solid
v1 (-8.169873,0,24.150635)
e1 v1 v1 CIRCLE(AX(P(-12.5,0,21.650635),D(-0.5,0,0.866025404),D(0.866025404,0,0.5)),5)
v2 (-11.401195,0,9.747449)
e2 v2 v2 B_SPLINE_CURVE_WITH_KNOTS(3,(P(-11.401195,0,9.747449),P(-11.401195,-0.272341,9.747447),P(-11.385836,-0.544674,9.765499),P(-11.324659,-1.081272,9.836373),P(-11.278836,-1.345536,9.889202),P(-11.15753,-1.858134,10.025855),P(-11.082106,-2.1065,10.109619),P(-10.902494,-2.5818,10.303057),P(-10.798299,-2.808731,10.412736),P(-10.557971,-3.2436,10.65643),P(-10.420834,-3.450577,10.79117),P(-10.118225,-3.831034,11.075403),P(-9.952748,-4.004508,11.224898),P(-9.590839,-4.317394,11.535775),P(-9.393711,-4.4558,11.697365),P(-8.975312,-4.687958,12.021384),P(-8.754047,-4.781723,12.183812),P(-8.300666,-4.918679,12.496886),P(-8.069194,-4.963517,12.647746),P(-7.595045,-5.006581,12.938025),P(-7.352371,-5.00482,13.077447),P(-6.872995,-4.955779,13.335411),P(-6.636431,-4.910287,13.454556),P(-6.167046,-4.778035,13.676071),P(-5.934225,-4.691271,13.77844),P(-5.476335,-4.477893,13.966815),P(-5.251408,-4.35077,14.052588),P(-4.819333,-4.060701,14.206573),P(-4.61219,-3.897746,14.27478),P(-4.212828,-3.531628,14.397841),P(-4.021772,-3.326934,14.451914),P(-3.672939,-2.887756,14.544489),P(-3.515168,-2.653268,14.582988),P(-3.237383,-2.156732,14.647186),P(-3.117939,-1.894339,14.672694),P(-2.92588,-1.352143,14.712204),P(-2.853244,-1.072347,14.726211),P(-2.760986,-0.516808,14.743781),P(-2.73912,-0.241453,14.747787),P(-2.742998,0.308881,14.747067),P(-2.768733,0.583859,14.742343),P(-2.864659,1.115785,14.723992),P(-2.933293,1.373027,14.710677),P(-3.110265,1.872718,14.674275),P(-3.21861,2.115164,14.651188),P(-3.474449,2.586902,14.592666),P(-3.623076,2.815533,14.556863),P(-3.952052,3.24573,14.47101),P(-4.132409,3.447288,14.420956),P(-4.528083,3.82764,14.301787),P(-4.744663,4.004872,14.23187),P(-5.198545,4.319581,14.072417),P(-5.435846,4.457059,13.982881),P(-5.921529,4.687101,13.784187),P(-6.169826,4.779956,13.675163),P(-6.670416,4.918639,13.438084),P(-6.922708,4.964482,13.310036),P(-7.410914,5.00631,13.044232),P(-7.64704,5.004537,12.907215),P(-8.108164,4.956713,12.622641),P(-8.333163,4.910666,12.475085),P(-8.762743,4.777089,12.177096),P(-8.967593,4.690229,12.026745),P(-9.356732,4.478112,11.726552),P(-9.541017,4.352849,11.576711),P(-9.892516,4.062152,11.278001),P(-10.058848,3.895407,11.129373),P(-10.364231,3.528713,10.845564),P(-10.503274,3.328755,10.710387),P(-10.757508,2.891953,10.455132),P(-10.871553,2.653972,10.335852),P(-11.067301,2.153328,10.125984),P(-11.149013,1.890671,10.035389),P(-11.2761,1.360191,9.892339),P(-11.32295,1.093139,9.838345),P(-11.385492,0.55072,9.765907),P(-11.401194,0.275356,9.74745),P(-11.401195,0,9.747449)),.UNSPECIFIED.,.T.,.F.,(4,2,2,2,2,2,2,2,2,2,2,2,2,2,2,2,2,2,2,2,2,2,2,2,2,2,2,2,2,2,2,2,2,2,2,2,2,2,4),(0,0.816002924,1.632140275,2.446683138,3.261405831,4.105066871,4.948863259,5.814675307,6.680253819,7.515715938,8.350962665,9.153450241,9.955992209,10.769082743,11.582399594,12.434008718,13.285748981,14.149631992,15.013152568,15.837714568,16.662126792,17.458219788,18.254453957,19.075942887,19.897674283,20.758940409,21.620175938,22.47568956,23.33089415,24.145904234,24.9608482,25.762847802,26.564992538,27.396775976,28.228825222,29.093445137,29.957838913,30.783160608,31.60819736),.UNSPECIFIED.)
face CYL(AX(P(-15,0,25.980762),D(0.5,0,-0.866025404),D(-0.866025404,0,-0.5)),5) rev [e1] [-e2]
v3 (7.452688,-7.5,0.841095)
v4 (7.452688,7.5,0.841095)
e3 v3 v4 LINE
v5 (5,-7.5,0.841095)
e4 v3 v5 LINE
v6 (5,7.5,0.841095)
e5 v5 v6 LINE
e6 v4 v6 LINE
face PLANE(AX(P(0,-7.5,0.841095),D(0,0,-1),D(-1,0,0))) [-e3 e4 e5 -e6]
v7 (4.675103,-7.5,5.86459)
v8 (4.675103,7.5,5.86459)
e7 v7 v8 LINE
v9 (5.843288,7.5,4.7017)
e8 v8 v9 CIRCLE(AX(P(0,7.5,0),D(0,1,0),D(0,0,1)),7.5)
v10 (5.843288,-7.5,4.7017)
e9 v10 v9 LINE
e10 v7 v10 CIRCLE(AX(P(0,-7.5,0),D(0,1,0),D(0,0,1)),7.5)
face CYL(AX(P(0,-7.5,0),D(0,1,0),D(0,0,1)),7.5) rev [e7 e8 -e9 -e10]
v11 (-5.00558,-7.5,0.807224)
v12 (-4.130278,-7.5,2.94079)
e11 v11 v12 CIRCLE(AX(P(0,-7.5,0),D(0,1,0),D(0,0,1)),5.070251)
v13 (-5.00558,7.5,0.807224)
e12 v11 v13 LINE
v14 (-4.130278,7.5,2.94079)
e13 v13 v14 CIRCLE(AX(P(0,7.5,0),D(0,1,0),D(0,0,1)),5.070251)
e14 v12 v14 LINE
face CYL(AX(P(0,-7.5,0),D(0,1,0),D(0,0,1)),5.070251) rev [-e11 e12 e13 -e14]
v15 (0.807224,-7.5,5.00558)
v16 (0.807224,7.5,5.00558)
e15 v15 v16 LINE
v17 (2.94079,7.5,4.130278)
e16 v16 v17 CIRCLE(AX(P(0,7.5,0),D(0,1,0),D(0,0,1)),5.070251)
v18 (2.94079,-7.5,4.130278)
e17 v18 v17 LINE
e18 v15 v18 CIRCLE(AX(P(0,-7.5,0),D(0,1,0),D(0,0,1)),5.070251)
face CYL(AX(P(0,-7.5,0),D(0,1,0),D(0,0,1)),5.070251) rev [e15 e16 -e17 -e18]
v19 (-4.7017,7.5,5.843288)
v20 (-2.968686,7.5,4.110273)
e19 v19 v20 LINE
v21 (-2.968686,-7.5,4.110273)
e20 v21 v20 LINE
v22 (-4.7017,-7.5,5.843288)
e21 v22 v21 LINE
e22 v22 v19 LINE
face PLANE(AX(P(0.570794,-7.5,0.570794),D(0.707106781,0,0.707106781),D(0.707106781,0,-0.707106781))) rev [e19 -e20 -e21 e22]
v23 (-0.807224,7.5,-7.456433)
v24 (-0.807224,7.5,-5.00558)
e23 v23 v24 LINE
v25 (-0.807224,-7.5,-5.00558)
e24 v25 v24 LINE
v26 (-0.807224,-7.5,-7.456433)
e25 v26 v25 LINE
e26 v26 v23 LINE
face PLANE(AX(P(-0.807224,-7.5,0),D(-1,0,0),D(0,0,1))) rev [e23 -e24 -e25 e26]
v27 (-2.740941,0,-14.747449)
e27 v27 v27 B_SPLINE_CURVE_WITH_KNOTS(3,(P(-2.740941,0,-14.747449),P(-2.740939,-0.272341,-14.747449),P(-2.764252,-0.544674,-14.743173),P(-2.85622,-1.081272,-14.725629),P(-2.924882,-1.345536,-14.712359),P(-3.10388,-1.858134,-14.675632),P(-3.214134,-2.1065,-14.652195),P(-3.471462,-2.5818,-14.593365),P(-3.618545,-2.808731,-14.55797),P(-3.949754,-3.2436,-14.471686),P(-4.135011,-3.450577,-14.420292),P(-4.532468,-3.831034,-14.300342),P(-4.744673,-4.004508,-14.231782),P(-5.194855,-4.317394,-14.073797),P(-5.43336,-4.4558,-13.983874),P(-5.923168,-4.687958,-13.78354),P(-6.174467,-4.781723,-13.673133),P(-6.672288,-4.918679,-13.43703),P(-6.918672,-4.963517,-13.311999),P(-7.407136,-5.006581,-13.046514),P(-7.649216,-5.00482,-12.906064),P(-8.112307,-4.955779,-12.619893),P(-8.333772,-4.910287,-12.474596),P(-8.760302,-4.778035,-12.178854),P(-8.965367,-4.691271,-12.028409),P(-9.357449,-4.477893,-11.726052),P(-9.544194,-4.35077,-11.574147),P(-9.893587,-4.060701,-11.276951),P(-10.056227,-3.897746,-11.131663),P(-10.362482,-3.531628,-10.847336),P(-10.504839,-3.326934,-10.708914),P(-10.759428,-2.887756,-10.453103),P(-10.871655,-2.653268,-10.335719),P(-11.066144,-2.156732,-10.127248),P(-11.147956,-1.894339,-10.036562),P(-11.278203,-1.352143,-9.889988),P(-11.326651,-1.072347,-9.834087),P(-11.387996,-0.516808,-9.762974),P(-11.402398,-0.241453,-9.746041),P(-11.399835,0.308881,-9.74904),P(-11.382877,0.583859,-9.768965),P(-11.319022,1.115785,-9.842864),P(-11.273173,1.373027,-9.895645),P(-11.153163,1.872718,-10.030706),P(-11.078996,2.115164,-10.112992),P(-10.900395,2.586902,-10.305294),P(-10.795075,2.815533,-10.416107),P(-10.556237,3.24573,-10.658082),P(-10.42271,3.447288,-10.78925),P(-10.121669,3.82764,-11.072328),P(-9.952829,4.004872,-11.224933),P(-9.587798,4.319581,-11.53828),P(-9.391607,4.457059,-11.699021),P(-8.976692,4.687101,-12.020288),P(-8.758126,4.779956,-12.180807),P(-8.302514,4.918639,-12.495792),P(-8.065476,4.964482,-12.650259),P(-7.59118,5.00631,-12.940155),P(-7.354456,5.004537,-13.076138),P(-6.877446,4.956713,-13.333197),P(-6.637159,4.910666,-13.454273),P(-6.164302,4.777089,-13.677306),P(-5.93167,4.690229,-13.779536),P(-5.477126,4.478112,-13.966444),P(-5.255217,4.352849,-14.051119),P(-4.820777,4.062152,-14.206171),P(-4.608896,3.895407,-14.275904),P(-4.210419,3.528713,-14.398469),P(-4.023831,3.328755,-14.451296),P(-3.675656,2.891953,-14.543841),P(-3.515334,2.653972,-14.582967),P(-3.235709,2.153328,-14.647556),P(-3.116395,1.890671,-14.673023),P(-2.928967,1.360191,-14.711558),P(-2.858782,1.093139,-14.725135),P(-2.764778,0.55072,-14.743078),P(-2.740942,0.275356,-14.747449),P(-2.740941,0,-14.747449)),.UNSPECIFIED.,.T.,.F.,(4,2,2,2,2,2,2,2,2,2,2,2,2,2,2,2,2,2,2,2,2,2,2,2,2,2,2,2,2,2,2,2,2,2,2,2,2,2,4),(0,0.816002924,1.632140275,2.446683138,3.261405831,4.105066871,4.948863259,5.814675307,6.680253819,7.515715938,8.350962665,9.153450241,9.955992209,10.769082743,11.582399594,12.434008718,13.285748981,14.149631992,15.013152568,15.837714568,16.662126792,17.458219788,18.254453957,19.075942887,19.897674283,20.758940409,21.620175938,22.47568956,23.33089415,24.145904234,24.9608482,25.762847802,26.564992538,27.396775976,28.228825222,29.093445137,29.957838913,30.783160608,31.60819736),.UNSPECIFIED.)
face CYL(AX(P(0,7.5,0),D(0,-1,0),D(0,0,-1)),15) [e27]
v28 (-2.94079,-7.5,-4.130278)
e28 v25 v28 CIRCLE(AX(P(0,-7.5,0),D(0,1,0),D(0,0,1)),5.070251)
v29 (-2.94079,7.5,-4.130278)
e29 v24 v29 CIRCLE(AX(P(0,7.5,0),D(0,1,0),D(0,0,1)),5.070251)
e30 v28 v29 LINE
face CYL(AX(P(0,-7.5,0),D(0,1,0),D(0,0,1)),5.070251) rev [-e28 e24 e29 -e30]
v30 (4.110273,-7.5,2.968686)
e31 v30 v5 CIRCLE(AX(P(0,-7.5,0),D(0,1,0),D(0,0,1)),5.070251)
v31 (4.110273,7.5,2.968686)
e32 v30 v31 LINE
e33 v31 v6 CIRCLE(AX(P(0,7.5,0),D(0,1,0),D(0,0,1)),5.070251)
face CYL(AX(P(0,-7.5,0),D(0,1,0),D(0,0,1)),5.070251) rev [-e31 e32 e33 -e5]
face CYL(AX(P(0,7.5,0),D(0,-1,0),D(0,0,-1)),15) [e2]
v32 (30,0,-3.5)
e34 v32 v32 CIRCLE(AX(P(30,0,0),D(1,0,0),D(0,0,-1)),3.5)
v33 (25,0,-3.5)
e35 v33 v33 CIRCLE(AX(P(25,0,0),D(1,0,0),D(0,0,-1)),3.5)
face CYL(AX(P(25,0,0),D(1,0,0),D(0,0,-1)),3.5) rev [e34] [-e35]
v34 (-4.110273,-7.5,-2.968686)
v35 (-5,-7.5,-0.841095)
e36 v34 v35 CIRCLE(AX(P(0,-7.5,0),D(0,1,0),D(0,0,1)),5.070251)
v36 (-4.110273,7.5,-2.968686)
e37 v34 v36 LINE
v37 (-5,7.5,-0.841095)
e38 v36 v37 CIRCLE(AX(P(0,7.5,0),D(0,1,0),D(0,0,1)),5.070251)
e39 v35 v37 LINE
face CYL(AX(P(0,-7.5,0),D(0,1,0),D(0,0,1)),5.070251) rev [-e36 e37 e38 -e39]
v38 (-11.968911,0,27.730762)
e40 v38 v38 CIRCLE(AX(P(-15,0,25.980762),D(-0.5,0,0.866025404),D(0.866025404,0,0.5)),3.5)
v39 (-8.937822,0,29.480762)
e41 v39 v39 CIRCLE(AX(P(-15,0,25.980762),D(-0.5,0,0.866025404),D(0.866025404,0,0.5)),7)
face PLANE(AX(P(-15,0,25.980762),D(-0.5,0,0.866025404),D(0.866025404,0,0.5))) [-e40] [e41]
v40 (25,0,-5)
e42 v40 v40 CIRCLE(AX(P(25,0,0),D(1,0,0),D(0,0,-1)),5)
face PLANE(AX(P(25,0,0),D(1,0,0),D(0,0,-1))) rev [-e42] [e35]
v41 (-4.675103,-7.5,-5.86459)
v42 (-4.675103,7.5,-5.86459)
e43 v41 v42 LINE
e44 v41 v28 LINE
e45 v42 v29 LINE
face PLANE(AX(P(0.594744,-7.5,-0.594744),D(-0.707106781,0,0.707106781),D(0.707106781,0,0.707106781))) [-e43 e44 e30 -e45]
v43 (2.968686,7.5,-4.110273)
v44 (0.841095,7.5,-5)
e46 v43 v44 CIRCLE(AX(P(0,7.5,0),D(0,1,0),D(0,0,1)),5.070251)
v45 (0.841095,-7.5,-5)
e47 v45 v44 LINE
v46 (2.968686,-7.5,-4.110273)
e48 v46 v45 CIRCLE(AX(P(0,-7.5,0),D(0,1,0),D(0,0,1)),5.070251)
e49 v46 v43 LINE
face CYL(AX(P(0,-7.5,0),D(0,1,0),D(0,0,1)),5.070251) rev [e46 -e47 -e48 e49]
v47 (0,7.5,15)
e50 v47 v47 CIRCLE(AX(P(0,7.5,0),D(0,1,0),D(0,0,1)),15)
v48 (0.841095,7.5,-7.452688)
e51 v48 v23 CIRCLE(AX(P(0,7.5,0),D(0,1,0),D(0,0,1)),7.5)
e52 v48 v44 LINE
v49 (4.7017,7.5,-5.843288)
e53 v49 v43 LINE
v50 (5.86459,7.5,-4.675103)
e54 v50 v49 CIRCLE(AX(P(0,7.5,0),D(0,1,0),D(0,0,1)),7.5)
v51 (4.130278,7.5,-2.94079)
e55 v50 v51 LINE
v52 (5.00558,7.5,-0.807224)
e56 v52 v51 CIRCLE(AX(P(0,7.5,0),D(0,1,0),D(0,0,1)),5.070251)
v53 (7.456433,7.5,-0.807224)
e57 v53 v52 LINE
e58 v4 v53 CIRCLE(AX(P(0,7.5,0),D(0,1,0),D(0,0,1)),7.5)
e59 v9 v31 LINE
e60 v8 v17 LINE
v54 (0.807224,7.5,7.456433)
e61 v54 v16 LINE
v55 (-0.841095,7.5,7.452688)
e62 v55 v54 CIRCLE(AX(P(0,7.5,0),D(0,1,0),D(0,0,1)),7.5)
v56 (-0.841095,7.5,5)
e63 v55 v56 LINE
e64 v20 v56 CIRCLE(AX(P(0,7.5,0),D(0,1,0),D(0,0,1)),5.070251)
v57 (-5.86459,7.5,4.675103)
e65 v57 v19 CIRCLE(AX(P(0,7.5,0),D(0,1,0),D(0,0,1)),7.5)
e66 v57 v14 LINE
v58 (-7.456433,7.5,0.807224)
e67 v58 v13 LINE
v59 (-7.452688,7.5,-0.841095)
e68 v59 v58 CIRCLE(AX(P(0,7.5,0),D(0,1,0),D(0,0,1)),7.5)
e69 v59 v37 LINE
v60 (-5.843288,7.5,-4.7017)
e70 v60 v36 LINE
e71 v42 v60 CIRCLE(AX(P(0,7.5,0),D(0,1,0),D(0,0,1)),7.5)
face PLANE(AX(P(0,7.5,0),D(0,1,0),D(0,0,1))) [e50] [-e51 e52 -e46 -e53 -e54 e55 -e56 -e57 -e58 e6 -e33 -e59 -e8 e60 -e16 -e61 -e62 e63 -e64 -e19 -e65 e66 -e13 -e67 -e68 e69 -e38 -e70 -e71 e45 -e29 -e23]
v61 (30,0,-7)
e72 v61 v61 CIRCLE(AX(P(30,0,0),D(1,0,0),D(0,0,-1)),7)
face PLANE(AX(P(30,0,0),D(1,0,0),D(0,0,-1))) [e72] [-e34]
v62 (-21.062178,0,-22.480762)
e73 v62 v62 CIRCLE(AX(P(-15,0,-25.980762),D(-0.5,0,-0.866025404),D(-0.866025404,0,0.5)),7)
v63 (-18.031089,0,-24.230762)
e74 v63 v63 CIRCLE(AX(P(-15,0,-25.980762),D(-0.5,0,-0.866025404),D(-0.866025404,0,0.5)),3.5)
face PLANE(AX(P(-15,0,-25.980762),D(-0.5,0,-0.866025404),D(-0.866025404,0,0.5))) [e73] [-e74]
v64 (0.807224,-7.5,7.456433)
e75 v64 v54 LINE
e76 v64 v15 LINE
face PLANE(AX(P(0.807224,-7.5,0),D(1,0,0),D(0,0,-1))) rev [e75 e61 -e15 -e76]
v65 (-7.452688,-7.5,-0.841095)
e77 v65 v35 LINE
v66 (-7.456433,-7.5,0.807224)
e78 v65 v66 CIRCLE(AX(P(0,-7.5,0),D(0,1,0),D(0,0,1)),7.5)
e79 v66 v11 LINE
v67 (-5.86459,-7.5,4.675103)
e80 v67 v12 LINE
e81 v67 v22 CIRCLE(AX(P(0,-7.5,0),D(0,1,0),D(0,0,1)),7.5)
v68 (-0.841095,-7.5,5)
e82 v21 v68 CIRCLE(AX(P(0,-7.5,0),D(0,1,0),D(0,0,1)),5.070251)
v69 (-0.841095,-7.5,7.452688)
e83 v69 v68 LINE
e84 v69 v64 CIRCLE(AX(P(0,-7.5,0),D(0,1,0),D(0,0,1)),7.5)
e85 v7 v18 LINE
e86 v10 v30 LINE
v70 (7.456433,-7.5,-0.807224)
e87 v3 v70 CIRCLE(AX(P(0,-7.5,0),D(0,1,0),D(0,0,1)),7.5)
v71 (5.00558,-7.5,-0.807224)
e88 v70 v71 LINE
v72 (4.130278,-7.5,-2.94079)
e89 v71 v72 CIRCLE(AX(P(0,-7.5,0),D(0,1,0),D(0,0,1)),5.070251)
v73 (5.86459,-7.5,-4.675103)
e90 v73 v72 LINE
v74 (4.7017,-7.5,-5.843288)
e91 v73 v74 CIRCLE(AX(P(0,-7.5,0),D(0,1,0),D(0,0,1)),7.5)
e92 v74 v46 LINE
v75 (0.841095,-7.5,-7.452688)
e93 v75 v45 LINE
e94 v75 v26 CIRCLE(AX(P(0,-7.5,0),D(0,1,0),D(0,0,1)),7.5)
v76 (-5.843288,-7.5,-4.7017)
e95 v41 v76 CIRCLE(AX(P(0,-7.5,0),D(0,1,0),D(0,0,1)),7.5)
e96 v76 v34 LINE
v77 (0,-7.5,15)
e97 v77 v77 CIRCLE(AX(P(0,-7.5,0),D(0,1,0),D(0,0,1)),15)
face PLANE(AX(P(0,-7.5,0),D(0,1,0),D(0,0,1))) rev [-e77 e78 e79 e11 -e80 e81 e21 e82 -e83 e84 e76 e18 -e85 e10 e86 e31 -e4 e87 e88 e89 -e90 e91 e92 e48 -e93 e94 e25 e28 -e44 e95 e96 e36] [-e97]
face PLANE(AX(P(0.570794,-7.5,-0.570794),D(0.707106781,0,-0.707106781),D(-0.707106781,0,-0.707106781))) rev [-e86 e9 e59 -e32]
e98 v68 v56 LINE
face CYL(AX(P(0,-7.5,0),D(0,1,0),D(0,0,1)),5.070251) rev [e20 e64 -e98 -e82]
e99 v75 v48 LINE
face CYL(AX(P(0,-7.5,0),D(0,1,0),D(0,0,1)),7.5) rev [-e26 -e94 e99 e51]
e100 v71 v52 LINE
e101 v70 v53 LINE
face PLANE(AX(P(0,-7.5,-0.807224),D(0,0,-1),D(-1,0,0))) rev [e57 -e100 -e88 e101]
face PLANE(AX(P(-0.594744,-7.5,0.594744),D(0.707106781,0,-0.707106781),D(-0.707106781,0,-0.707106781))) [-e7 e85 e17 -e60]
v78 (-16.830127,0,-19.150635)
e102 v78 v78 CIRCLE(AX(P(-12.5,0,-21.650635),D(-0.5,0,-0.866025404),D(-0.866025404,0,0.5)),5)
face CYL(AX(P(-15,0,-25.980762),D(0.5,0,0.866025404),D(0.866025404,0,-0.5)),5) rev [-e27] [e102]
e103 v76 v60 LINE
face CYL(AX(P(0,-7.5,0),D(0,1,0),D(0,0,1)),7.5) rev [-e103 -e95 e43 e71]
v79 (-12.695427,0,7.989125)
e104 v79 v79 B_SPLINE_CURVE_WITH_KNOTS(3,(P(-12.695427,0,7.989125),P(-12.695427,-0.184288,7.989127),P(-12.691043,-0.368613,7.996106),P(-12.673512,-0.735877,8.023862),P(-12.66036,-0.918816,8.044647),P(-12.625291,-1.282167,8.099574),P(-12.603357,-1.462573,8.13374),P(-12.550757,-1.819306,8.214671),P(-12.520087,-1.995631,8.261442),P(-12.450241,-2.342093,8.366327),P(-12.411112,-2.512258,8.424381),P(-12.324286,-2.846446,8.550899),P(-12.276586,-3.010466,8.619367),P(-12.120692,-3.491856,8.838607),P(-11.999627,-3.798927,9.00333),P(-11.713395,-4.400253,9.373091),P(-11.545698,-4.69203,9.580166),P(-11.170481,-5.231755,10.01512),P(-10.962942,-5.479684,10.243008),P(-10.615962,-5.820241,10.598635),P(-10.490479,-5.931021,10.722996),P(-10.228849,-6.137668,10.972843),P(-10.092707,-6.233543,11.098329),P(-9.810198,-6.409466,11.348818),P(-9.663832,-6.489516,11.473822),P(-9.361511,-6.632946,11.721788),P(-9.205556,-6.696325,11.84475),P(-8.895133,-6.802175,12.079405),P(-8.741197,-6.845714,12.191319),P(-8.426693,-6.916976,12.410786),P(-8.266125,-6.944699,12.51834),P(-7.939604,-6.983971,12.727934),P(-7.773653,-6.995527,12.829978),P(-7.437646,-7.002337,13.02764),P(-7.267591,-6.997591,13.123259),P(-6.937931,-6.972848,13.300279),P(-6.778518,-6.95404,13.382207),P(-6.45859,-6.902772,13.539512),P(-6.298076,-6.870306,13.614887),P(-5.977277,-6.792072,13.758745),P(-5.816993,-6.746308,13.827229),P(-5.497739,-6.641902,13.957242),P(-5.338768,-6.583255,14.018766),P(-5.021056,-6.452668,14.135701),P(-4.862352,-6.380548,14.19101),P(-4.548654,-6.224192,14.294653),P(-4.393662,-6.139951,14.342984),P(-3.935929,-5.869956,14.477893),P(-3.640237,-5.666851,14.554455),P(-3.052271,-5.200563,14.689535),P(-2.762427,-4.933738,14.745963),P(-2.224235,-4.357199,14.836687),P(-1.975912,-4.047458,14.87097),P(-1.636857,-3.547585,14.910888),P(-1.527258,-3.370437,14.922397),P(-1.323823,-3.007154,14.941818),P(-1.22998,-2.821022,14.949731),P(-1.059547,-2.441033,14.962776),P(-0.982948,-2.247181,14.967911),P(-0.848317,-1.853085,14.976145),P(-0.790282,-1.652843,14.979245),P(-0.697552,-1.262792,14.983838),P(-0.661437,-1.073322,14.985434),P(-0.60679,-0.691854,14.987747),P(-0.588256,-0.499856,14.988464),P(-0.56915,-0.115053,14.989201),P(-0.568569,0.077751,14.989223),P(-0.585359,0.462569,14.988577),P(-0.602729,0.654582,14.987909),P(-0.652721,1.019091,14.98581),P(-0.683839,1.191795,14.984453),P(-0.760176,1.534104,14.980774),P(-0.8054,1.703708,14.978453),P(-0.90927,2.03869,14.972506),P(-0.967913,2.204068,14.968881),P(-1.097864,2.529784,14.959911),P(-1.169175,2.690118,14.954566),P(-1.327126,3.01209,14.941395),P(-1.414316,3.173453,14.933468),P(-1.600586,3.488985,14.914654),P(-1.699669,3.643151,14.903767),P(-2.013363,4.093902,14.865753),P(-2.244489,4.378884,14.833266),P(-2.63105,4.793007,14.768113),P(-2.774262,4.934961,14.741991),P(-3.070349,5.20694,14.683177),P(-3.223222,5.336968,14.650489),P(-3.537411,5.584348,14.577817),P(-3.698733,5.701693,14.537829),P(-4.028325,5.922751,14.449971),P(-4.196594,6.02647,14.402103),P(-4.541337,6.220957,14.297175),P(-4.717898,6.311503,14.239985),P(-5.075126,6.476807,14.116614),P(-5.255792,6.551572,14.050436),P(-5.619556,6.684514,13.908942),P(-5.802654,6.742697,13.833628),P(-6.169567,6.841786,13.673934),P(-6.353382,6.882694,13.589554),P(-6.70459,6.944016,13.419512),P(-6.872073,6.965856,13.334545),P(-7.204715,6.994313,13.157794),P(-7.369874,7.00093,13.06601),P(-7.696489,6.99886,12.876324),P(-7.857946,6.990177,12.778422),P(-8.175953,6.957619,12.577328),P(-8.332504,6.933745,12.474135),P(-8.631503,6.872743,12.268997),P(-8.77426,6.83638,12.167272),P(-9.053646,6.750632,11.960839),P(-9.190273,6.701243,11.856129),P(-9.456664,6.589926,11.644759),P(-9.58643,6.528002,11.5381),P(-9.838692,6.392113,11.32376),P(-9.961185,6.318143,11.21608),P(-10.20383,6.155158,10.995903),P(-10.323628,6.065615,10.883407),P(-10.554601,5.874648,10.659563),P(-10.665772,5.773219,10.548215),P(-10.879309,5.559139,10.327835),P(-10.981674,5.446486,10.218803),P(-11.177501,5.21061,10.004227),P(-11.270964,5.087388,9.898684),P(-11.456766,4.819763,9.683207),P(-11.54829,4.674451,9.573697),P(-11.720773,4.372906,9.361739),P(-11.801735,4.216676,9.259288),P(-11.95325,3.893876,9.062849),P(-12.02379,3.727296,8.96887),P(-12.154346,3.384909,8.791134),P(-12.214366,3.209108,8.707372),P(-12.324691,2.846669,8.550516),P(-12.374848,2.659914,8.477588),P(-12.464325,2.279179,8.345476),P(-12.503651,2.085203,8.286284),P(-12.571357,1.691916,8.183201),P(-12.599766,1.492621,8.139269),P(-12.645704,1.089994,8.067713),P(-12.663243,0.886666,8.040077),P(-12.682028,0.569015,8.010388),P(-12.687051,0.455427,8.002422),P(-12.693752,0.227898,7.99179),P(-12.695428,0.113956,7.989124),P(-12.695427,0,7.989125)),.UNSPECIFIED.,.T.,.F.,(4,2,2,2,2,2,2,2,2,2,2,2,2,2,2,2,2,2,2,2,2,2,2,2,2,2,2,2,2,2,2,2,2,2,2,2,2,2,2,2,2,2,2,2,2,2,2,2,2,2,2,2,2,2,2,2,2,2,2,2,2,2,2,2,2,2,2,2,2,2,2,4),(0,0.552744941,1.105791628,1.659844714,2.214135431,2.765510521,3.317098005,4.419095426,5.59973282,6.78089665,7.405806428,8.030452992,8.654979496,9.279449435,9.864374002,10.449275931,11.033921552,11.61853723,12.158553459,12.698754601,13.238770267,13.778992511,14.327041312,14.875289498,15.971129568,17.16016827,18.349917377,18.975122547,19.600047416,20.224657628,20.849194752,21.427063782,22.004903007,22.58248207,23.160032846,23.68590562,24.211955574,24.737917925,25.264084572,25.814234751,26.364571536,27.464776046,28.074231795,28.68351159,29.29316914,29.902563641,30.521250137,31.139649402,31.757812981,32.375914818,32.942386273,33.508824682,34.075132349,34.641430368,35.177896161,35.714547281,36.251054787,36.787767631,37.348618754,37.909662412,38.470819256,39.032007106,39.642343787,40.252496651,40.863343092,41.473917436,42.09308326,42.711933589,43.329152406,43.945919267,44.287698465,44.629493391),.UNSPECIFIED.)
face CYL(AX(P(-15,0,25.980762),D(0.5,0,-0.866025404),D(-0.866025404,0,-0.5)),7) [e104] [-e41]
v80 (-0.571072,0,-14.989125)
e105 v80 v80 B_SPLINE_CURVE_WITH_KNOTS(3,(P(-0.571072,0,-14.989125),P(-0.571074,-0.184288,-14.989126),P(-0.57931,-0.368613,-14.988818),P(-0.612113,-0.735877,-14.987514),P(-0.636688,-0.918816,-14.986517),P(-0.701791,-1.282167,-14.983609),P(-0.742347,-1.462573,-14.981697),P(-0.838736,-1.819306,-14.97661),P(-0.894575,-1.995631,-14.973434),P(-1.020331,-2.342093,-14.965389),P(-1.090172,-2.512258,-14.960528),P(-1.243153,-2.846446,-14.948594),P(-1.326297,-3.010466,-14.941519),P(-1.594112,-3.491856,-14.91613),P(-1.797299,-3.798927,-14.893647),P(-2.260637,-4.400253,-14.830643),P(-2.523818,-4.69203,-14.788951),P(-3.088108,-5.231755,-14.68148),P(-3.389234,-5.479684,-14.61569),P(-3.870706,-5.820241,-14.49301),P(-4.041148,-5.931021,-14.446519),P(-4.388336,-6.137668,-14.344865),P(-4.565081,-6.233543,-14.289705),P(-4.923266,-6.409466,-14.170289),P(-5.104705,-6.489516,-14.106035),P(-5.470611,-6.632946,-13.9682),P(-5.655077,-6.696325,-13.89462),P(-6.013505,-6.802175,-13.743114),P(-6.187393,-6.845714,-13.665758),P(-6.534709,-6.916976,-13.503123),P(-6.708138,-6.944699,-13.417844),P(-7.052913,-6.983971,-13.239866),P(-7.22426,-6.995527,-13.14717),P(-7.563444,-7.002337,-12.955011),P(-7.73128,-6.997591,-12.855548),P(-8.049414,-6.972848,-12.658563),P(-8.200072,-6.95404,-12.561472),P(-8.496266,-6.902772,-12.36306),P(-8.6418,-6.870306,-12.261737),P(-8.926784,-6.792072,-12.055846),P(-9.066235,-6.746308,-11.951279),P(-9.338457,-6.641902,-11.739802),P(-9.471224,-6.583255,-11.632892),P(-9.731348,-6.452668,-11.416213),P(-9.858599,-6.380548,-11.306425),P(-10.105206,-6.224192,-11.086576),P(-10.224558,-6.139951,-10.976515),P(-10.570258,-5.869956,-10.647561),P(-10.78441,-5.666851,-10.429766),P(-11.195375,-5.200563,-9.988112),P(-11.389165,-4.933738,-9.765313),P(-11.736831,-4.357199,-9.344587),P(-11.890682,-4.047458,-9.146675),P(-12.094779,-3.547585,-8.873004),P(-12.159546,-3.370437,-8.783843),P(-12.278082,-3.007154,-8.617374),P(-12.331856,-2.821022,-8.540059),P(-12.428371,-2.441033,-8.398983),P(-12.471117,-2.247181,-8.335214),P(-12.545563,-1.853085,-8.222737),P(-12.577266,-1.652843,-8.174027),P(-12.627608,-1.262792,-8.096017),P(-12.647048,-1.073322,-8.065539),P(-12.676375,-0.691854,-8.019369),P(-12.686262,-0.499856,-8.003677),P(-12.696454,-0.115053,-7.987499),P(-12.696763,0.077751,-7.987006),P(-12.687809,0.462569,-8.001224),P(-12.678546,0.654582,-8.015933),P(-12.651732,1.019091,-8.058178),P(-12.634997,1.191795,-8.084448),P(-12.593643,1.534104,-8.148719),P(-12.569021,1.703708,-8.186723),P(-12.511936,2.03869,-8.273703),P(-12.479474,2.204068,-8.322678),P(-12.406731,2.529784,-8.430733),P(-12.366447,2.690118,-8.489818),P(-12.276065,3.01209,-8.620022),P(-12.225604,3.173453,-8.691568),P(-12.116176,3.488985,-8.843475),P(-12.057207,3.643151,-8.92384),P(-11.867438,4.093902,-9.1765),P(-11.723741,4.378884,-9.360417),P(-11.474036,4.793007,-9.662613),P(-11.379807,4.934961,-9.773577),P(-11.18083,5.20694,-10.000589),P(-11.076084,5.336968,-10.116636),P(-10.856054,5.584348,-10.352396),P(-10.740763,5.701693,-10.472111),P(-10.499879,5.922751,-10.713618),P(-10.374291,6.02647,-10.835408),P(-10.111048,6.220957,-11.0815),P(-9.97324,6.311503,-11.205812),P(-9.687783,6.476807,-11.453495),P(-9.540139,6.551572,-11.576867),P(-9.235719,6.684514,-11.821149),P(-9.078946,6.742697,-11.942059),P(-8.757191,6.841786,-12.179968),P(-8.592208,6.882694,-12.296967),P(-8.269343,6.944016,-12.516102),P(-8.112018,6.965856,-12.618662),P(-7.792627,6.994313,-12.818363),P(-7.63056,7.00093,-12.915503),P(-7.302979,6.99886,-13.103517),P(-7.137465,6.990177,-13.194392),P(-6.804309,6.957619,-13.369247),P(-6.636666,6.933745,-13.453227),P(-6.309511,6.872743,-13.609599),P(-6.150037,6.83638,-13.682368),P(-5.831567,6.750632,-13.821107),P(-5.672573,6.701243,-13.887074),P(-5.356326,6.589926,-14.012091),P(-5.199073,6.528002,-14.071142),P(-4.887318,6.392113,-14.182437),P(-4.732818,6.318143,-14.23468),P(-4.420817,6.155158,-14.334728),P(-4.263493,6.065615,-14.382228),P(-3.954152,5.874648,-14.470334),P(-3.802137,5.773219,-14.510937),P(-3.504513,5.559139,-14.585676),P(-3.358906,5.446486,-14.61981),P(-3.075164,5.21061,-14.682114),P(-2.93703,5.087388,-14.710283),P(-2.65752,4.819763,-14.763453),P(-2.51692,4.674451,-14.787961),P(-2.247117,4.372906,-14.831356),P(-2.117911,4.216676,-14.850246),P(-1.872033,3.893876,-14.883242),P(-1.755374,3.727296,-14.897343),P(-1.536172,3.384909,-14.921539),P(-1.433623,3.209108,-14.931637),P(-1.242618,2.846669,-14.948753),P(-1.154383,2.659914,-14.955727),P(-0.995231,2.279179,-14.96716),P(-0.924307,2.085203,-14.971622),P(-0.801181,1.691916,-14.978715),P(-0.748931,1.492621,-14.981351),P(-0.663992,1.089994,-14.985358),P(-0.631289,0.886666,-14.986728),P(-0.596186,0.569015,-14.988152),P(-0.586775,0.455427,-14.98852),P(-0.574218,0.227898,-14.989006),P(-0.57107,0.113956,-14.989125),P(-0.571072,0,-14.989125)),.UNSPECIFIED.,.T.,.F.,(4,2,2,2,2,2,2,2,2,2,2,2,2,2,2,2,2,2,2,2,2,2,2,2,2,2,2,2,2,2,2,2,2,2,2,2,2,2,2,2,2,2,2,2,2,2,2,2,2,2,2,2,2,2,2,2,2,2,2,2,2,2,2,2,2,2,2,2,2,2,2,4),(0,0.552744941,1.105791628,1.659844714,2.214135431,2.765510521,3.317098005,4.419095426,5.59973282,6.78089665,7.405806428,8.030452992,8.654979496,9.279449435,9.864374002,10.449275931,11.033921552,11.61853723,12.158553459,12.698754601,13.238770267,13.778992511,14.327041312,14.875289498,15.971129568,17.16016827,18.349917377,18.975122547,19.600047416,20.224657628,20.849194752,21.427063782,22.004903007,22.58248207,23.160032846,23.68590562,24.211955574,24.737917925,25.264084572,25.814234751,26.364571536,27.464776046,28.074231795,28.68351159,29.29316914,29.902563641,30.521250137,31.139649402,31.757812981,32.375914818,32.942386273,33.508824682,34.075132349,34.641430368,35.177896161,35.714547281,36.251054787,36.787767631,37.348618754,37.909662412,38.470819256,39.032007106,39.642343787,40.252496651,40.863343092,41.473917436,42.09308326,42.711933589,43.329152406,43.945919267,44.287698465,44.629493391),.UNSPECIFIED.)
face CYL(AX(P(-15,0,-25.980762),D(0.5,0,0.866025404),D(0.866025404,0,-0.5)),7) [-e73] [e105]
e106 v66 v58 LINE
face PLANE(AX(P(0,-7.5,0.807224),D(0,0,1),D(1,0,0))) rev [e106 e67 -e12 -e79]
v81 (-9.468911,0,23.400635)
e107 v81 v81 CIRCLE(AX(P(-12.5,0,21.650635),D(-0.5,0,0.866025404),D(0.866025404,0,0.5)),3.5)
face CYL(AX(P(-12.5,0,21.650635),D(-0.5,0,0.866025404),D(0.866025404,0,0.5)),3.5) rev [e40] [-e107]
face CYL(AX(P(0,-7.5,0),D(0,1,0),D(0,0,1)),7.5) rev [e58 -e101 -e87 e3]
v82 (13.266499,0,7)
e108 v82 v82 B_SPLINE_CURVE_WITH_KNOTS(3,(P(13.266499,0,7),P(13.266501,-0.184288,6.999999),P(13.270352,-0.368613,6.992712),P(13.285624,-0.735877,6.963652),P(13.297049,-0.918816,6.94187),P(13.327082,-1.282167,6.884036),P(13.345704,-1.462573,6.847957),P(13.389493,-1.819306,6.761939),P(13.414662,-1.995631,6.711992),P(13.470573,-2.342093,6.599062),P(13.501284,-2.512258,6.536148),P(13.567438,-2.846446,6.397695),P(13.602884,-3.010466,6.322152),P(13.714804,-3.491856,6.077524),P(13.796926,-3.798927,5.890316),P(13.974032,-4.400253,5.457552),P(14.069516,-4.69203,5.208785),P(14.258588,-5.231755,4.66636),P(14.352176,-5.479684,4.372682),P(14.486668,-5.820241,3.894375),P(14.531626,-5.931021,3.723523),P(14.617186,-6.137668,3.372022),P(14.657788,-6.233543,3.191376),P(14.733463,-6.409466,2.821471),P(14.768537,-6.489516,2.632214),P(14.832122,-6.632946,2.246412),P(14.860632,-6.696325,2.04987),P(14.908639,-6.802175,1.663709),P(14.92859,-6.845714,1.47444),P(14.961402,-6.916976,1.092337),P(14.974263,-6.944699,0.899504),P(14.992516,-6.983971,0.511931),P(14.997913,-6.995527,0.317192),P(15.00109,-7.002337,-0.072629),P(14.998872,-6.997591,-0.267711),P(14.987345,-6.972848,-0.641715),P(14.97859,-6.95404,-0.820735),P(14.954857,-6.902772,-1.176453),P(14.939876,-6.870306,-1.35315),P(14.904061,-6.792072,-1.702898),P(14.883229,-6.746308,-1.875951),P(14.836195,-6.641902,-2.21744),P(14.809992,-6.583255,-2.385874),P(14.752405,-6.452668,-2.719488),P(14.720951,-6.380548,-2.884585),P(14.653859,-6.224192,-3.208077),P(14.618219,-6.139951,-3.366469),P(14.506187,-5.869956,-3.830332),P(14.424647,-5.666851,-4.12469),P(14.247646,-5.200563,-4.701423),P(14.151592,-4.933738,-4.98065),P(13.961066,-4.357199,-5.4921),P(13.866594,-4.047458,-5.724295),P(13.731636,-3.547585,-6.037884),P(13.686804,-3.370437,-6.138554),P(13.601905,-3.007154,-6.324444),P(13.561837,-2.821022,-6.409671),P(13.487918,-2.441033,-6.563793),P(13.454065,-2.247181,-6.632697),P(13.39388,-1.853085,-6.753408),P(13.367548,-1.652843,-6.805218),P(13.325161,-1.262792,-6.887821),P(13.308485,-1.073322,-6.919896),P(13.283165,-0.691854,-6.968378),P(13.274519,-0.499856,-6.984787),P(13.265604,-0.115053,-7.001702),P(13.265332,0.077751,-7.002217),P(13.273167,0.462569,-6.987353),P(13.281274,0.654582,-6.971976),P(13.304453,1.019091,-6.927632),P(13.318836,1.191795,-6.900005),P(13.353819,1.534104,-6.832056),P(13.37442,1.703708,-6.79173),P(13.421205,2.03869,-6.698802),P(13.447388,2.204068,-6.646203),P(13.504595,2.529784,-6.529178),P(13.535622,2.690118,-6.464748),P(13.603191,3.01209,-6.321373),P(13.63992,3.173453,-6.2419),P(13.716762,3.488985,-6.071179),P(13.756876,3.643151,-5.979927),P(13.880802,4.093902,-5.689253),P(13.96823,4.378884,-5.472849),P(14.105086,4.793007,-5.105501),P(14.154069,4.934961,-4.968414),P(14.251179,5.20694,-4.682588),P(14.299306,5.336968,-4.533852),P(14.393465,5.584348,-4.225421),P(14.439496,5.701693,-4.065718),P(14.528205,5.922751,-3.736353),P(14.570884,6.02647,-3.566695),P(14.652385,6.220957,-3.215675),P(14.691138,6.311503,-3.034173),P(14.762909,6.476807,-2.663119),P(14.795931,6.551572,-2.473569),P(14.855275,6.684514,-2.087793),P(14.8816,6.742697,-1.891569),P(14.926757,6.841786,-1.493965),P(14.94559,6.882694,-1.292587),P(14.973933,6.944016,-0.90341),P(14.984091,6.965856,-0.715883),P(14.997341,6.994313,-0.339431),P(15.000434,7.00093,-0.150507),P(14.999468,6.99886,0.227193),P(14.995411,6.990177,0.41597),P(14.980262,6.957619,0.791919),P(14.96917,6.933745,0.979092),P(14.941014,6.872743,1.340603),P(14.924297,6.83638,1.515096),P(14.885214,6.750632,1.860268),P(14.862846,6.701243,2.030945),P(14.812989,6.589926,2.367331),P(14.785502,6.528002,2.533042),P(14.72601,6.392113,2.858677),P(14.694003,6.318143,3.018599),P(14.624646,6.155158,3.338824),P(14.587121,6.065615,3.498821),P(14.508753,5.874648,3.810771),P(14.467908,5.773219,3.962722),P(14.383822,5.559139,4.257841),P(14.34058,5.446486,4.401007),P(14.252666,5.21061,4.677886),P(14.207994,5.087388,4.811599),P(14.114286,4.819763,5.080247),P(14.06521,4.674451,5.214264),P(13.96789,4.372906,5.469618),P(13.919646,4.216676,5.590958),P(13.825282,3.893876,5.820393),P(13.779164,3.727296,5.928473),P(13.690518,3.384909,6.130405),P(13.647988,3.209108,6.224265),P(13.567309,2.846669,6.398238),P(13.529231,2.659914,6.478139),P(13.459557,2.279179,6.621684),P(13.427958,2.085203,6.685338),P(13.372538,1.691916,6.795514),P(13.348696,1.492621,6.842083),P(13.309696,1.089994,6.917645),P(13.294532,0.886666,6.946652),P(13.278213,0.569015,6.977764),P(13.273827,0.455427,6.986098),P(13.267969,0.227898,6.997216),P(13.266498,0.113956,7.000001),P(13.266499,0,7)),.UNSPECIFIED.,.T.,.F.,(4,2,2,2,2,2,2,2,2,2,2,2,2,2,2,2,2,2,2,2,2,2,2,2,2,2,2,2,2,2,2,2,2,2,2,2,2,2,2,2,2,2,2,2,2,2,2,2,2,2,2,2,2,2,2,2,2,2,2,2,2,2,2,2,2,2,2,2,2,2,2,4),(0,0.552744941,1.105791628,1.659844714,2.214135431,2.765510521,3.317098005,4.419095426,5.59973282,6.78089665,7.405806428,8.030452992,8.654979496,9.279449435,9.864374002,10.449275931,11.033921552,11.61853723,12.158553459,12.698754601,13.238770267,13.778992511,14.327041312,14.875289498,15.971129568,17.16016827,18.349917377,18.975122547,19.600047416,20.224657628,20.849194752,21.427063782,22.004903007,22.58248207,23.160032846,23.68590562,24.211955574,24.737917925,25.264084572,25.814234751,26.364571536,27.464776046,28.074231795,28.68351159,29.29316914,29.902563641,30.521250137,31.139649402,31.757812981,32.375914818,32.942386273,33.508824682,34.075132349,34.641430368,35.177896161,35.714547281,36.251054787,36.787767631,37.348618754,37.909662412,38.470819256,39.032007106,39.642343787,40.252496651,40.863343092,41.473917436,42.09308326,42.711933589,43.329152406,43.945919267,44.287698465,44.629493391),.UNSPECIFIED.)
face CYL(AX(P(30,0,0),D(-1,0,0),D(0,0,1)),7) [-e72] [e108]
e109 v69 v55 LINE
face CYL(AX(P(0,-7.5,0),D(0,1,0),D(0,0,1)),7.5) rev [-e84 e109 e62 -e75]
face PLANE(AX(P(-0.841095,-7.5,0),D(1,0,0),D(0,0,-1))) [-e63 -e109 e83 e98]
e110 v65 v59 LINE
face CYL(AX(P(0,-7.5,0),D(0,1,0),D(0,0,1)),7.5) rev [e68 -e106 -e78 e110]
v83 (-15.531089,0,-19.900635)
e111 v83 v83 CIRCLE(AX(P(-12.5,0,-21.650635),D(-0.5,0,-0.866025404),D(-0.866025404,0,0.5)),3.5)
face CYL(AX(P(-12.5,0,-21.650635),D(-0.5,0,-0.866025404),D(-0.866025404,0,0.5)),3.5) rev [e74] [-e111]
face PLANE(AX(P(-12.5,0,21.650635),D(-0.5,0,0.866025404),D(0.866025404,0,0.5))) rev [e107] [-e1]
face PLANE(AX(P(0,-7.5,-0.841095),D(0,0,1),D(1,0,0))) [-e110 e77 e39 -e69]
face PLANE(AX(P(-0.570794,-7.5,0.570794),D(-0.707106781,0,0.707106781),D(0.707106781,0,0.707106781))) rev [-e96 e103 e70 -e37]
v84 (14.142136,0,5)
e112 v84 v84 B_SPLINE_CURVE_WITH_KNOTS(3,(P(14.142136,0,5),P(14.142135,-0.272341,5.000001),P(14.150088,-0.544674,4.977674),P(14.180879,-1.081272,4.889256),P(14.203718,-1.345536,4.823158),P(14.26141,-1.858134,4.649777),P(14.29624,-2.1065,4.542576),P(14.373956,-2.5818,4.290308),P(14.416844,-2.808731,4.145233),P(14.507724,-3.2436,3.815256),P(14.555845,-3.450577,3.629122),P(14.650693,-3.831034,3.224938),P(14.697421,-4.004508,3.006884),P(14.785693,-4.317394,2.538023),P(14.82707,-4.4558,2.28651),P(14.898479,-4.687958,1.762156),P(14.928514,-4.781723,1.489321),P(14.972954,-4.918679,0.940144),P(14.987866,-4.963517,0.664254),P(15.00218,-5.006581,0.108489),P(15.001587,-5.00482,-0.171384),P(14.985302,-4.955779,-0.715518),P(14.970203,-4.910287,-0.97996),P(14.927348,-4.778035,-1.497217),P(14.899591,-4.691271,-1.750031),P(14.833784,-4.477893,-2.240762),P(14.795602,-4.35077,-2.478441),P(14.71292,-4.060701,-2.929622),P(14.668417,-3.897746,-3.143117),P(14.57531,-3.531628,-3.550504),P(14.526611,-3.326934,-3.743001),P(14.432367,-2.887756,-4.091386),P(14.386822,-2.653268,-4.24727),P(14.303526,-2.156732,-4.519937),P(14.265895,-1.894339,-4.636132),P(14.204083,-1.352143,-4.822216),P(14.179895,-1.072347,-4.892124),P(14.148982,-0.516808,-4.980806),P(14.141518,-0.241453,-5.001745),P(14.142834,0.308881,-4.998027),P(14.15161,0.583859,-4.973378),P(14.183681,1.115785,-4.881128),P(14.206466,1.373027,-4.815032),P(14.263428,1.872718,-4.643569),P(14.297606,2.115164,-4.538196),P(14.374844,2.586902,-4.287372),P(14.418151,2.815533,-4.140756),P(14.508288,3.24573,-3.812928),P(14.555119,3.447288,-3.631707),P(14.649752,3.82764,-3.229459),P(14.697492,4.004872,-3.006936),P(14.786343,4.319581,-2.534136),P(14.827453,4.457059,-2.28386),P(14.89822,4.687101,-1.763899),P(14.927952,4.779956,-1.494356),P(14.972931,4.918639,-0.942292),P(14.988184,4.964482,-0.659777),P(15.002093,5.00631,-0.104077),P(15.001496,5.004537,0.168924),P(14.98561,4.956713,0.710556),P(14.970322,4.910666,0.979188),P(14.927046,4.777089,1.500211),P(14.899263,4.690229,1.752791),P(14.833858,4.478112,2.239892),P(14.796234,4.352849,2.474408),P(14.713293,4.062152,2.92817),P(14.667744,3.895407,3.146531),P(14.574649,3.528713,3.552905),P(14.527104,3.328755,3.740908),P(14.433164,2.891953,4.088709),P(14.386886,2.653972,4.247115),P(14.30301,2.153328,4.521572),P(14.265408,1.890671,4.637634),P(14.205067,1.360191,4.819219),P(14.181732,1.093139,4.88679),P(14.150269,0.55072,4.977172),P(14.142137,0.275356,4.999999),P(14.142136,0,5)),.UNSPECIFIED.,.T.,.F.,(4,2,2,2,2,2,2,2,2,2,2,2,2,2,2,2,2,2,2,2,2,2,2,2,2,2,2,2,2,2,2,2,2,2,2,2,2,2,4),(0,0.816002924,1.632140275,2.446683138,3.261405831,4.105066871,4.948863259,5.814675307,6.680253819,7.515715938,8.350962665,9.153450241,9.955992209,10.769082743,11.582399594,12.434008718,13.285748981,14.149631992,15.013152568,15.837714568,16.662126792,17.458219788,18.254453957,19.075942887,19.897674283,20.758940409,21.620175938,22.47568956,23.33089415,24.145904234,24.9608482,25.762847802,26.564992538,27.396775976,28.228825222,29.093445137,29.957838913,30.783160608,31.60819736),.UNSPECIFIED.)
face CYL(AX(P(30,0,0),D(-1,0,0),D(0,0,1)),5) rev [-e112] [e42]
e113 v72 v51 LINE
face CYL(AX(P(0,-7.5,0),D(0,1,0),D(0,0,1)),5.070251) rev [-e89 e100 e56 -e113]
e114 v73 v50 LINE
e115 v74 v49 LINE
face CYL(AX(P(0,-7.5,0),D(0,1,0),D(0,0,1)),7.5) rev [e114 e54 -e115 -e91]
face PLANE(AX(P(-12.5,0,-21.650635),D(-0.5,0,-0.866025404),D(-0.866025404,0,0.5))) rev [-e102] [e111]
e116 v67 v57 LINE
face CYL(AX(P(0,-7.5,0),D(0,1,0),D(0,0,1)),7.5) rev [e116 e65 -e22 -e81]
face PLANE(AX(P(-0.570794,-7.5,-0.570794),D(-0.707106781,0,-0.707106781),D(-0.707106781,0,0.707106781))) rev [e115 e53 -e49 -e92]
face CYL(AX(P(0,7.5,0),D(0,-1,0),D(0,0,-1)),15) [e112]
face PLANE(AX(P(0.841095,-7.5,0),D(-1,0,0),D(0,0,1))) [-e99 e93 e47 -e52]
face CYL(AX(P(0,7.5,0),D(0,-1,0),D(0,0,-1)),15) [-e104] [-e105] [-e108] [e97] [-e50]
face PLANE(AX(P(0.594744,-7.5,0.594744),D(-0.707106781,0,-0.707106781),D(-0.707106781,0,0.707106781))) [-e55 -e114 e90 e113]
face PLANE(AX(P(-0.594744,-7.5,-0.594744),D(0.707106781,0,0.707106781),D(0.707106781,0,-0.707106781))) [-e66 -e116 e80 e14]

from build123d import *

# Parameters (mm, degrees)
SKETCH1_R                 = 15
BOSS_EXTRUDE1_DEPTH       = 7.5
BOSS_EXTRUDE2_START       = 13
SKETCH3_R                 = 7
SKETCH3_R_2               = 5
BOSS_EXTRUDE2_DEPTH       = 17
SKETCH3_4_R               = 3.5
SKETCH3_4_R_2             = 5
BOSS_EXTRUDE3_DEPTH       = 14
BOSS_EXTRUDE4_START       = 25
BOSS_EXTRUDE4_OUTLINE_R   = 5
BOSS_EXTRUDE4_OUTLINE_R_2 = 3.5
BOSS_EXTRUDE4_DEPTH       = 5
CIRPATTERN14_COUNT        = 3
CUT_EXTRUDE5_DEPTH        = 45.655518692


# Read off the part's stored shape, not the designer's step: Boss-Extrude4
with BuildPart() as part:
    # Sketch1 → Boss-Extrude1 (new, symmetric)
    with BuildSketch(Plane(origin=(0, 0, 0), x_dir=(1, 0, 0), z_dir=(0, 1, 0))):
        with Locations(Location((0, 0, 0), (0, 0, 270))):
            Circle(SKETCH1_R)
    extrude(amount=BOSS_EXTRUDE1_DEPTH, both=True)

    # Sketch3 → Boss-Extrude2 (add)
    with BuildSketch(Plane(origin=(0, 0, 0), x_dir=(0, 0, -1), z_dir=(1, 0, 0)).offset(BOSS_EXTRUDE2_START)):
        with Locations(Location((0, 0, 0), (0, 0, 180))):
            Circle(SKETCH3_R)
        with Locations(Location((0, 0, 0), (0, 0, 180))):
            Circle(SKETCH3_R_2, mode=Mode.SUBTRACT)
    boss_extrude2 = extrude(amount=BOSS_EXTRUDE2_DEPTH)

    # Sketch3<4> → Boss-Extrude3 (add)
    with BuildSketch(Plane(origin=(0, 0, 0), x_dir=(0, 0, -1), z_dir=(1, 0, 0))):
        Circle(SKETCH3_4_R)
        with Locations(Location((0, 0, 0), (0, 0, 180))):
            Circle(SKETCH3_4_R_2)
    boss_extrude3 = extrude(amount=BOSS_EXTRUDE3_DEPTH)

    # Boss-Extrude4 outline → Boss-Extrude4 (add)
    with BuildSketch(Plane(origin=(0, 0, 0), x_dir=(0, 0, -1), z_dir=(1, 0, 0)).offset(BOSS_EXTRUDE4_START)):
        Circle(BOSS_EXTRUDE4_OUTLINE_R)
        Circle(BOSS_EXTRUDE4_OUTLINE_R_2, mode=Mode.SUBTRACT)
    boss_extrude4 = extrude(amount=BOSS_EXTRUDE4_DEPTH)

    # CirPattern14: Boss-Extrude2, Boss-Extrude3, Boss-Extrude4 ×3 about axis
    cirpattern14_axis = Axis((0, -7.5, 0), (0, 1, 0))
    add([boss_extrude2.rotate(cirpattern14_axis, i * 360 / CIRPATTERN14_COUNT) for i in range(1, CIRPATTERN14_COUNT)])
    add([boss_extrude3.rotate(cirpattern14_axis, i * 360 / CIRPATTERN14_COUNT) for i in range(1, CIRPATTERN14_COUNT)])
    add([boss_extrude4.rotate(cirpattern14_axis, i * 360 / CIRPATTERN14_COUNT) for i in range(1, CIRPATTERN14_COUNT)])

    # Sketch4 → Cut-Extrude5 (cut, through all)
    with BuildSketch(Plane(origin=(0, 7.5, 0), x_dir=(1, 0, 0), z_dir=(0, 1, 0))):
        with BuildLine():
            ThreePointArc((5.864590062, 4.675102502), (5.315335108, 5.29123924), (4.701700296, 5.843287972))
            Line((4.701700296, 5.843287972), (2.968685581, 4.110273257))
            ThreePointArc((2.968685581, 4.110273257), (1.956146698, 4.677705679), (0.84109472, 5))
            Line((0.84109472, 5), (0.84109472, 7.452688084))
            ThreePointArc((0.84109472, 7.452688084), (0.017038352, 7.499980646), (-0.807224387, 7.456432712))
            Line((-0.807224387, 7.456432712), (-0.807224387, 5.005579798))
            ThreePointArc((-0.807224387, 5.005579798), (-1.924432811, 4.690842002), (-2.940790126, 4.130277686))
            Line((-2.940790126, 4.130277686), (-4.675102502, 5.864590062))
            ThreePointArc((-4.675102502, 5.864590062), (-5.29123924, 5.315335108), (-5.843287972, 4.701700296))
            Line((-5.843287972, 4.701700296), (-4.110273257, 2.968685581))
            ThreePointArc((-4.110273257, 2.968685581), (-4.677705679, 1.956146698), (-5, 0.84109472))
            Line((-5, 0.84109472), (-7.452688084, 0.84109472))
            ThreePointArc((-7.452688084, 0.84109472), (-7.499980646, 0.017038352), (-7.456432712, -0.807224387))
            Line((-7.456432712, -0.807224387), (-5.005579798, -0.807224387))
            ThreePointArc((-5.005579798, -0.807224387), (-4.690842002, -1.924432811), (-4.130277686, -2.940790126))
            Line((-4.130277686, -2.940790126), (-5.864590062, -4.675102502))
            ThreePointArc((-5.864590062, -4.675102502), (-5.315335108, -5.29123924), (-4.701700296, -5.843287972))
            Line((-4.701700296, -5.843287972), (-2.968685581, -4.110273257))
            ThreePointArc((-2.968685581, -4.110273257), (-1.956146698, -4.677705679), (-0.84109472, -5))
            Line((-0.84109472, -5), (-0.84109472, -7.452688084))
            ThreePointArc((-0.84109472, -7.452688084), (-0.017038352, -7.499980646), (0.807224387, -7.456432712))
            Line((0.807224387, -7.456432712), (0.807224387, -5.005579798))
            ThreePointArc((0.807224387, -5.005579798), (1.924432811, -4.690842002), (2.940790126, -4.130277686))
            Line((2.940790126, -4.130277686), (4.675102502, -5.864590062))
            ThreePointArc((4.675102502, -5.864590062), (5.29123924, -5.315335108), (5.843287972, -4.701700296))
            Line((5.843287972, -4.701700296), (4.110273257, -2.968685581))
            ThreePointArc((4.110273257, -2.968685581), (4.677705679, -1.956146698), (5, -0.84109472))
            Line((5, -0.84109472), (7.452688084, -0.84109472))
            ThreePointArc((7.452688084, -0.84109472), (7.499980646, -0.017038352), (7.456432712, 0.807224387))
            Line((7.456432712, 0.807224387), (5.005579798, 0.807224387))
            ThreePointArc((5.005579798, 0.807224387), (4.690842002, 1.924432811), (4.130277686, 2.940790126))
            Line((4.130277686, 2.940790126), (5.864590062, 4.675102502))
        make_face()
    extrude(amount=-CUT_EXTRUDE5_DEPTH, mode=Mode.SUBTRACT)


solid = part.part
